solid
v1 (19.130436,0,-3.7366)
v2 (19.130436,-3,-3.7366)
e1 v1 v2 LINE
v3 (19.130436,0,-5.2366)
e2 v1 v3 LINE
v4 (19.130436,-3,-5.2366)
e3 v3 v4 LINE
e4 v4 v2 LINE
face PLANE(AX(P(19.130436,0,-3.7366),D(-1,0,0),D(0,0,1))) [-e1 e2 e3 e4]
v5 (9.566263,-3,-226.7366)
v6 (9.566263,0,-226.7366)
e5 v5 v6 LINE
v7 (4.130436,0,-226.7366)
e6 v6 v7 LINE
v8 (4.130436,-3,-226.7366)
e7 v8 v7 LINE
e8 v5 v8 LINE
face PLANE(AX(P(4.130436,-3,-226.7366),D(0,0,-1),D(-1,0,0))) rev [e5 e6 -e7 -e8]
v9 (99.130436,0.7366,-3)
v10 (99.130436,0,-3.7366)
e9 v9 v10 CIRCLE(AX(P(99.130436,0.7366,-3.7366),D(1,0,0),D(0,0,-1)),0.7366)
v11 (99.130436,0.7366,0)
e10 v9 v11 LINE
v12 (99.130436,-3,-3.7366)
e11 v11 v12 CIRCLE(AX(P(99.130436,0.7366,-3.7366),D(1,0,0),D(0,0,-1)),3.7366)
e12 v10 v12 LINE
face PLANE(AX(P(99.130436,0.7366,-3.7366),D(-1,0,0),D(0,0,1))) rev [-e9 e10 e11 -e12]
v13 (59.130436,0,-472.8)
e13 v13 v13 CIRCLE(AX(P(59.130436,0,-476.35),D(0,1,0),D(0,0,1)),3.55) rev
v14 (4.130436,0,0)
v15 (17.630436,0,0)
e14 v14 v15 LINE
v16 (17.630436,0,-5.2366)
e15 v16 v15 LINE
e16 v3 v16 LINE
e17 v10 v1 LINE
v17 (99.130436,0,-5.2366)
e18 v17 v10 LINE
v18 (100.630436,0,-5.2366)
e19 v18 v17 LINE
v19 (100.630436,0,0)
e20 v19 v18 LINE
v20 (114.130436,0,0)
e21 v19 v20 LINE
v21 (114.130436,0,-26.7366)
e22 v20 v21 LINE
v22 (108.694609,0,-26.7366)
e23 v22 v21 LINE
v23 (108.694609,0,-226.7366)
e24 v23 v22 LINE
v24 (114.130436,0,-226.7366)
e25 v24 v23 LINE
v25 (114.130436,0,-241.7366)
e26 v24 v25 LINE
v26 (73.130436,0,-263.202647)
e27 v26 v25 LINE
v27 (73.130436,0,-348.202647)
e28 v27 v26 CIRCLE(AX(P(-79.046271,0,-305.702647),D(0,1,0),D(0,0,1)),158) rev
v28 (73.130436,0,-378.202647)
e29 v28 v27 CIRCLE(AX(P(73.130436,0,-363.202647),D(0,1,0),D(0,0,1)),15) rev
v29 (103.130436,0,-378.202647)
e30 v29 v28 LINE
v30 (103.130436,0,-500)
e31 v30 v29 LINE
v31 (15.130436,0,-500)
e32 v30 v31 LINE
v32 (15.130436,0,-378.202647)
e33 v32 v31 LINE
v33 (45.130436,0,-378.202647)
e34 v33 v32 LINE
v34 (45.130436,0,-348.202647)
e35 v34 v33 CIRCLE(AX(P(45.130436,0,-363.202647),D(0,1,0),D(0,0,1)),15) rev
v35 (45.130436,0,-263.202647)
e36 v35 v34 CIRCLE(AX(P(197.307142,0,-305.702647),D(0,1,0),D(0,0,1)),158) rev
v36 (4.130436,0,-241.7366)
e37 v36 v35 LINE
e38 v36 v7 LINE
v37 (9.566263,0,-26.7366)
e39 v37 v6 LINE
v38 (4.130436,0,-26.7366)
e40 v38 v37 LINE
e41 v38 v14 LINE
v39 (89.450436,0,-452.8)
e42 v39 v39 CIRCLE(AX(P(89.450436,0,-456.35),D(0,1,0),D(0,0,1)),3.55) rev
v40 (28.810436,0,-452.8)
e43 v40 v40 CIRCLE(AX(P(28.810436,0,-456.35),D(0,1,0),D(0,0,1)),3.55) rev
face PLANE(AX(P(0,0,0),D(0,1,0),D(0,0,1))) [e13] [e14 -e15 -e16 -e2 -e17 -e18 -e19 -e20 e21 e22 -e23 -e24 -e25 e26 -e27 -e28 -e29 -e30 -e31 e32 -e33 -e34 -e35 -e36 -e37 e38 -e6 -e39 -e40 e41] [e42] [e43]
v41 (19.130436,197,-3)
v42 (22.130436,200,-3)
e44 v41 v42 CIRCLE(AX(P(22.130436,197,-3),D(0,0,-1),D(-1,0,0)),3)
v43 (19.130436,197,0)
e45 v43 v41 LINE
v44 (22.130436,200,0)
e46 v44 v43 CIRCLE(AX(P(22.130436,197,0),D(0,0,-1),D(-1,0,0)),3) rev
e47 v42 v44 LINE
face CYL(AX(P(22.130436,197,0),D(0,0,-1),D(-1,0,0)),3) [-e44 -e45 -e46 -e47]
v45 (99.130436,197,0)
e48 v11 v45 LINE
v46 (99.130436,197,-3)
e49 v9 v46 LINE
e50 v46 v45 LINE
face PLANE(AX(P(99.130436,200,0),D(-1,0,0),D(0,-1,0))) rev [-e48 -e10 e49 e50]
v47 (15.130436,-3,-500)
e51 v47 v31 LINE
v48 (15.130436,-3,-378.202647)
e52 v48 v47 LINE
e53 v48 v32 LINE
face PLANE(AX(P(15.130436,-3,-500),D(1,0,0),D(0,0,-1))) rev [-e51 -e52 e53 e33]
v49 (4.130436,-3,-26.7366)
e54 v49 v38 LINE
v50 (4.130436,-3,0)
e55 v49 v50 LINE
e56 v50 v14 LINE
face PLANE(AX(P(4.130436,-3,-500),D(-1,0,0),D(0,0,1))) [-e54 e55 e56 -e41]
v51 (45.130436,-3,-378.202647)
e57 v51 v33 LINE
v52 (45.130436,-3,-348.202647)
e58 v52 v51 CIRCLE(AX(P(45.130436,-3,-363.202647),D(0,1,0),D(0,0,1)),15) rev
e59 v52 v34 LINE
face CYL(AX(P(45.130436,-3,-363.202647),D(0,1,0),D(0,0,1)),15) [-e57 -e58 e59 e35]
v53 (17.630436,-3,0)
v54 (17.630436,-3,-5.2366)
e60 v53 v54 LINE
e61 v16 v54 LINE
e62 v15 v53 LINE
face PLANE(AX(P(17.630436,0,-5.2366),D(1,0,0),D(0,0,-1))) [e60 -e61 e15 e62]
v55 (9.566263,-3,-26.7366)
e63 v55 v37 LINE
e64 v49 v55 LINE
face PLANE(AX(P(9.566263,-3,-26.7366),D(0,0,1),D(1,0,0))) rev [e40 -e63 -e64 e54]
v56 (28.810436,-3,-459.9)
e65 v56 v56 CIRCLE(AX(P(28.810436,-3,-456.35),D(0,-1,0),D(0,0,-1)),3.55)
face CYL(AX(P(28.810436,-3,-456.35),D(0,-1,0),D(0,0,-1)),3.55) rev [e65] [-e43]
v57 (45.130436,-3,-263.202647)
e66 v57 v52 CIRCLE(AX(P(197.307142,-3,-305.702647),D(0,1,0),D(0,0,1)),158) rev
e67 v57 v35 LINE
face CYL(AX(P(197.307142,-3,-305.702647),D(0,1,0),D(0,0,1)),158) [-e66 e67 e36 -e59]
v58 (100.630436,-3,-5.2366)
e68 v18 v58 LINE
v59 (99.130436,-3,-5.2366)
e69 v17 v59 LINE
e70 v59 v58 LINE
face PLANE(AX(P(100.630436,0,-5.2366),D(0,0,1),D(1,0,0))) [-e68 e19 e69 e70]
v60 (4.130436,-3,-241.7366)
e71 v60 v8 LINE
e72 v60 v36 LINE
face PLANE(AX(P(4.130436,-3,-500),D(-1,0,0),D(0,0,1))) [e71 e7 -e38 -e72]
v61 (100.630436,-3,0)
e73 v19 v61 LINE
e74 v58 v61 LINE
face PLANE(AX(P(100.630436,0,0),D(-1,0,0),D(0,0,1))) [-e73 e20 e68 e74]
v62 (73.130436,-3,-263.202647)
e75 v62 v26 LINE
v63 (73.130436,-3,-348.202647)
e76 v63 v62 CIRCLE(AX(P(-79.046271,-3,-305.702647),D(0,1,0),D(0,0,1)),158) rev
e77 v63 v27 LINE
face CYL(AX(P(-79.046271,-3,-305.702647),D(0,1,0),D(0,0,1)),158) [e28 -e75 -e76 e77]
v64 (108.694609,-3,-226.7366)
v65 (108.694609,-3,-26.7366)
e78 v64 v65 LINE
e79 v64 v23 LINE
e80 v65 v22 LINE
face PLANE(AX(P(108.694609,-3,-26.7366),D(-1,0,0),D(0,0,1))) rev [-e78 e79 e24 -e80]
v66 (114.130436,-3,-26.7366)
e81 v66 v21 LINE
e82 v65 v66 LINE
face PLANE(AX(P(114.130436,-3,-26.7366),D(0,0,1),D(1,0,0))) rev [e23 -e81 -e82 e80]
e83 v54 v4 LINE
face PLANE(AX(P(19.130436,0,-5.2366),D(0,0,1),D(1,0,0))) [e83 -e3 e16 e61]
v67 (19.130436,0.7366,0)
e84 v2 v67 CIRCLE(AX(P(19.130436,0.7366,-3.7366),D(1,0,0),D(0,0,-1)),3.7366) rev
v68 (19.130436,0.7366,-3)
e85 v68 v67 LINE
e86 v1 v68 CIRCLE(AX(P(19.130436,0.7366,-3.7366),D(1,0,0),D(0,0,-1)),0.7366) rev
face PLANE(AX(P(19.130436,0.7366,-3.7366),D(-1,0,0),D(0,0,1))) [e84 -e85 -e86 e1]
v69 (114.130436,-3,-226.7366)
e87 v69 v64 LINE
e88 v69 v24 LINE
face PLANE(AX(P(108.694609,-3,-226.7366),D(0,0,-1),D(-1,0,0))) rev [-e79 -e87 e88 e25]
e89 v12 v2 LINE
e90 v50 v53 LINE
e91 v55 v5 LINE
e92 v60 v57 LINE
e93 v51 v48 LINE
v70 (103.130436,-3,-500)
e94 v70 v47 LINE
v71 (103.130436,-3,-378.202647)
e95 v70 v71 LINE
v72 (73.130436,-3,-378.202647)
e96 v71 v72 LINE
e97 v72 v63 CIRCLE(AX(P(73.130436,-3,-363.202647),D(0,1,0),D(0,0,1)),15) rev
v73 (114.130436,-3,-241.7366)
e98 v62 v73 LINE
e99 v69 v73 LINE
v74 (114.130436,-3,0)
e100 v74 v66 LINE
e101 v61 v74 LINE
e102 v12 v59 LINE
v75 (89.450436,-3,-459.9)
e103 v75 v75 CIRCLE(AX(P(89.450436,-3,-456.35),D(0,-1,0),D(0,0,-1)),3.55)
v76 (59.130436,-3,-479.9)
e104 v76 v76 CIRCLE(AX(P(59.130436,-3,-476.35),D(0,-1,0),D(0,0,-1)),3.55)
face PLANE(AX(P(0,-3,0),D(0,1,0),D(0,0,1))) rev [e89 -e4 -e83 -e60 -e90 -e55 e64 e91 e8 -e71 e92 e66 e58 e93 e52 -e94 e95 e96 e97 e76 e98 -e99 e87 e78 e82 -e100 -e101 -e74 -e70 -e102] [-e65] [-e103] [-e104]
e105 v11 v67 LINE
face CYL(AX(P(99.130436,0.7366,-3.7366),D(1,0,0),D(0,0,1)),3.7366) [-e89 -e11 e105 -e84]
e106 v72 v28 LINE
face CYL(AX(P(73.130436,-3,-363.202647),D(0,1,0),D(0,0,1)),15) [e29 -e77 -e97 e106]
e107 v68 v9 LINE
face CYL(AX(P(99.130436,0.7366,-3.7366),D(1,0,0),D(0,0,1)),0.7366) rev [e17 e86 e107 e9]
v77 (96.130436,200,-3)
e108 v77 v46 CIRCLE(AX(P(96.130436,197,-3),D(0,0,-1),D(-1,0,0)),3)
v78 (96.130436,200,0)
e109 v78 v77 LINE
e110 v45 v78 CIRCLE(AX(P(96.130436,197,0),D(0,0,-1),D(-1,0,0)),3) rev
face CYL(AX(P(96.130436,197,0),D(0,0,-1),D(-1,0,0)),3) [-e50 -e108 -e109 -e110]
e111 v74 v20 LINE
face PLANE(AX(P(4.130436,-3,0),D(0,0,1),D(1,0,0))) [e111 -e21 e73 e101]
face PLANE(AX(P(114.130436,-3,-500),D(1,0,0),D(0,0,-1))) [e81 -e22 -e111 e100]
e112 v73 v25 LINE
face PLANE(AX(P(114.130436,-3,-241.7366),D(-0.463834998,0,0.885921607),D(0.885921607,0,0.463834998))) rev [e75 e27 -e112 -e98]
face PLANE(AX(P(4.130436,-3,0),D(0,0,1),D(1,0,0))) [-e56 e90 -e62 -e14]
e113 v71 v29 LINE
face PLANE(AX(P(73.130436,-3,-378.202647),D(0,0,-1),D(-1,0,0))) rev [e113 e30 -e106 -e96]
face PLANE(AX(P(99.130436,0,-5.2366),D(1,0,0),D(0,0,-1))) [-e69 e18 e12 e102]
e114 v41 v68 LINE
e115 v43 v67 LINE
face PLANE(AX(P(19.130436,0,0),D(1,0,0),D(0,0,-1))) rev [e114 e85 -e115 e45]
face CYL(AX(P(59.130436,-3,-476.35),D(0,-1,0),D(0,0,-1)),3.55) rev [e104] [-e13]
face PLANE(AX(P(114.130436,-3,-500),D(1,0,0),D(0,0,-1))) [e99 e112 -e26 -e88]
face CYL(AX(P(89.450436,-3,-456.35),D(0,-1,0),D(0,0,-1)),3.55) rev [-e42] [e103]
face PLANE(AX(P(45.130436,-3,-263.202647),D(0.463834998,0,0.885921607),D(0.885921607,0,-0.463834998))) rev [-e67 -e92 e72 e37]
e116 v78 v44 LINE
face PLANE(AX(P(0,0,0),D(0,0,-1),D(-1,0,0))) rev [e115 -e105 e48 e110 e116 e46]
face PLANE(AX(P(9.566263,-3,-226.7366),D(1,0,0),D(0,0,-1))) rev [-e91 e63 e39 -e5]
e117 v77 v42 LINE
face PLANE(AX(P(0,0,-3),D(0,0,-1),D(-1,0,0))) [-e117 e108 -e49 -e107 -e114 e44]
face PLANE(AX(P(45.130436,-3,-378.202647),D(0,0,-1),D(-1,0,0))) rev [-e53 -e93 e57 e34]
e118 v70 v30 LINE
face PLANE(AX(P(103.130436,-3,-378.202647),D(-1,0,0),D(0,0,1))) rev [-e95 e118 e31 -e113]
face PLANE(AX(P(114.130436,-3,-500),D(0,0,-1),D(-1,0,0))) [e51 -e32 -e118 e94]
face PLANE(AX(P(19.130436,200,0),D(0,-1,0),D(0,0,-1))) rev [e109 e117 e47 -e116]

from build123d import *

# Parameters (mm, degrees)
BASE_FLANGE1_START                     = -3
BASE_FLANGE1_OUTLINE_W                 = 110
BASE_FLANGE1_OUTLINE_H                 = 500
BASE_FLANGE1_DEPTH                     = 3
T_LE_PLI_E_SUR_AR_TE1_STRIP_W          = 13.4732
T_LE_PLI_E_SUR_AR_TE1_STRIP_H          = 3
T_LE_PLI_E_SUR_AR_TE1_STRIP_CUT_DEPTH  = 80
T_LE_PLI_E_SUR_AR_TE1_RELIEF_W         = 14.9732
T_LE_PLI_E_SUR_AR_TE1_RELIEF_H         = 1.5
T_LE_PLI_E_SUR_AR_TE1_RELIEF_CUT_DEPTH = 3
T_LE_PLI_E_SUR_AR_TE1_DEPTH            = 80
FILLET2_R                              = 3
CUT_EXTRUDE2_DEPTH                     = 552.574796719
CUT_EXTRUDE2_DEPTH_BACK                = 3
F_7_1_7_1_DIAMETER_SLOT1_D             = 7.1
F_7_1_7_1_DIAMETER_SLOT1_DEPTH         = 3
F_7_1_7_1_DIAMETER_SLOT1_TIP           = 2.133055198


# Read off the part's stored shape, not the designer's step: Base-Flange1
# Sheet-metal steps are written as plain solids
with BuildPart() as part:
    # Base-Flange1 outline → Base-Flange1 (new body)
    with BuildSketch(Plane(origin=(0, 0, 0), x_dir=(1, 0, 0), z_dir=(0, 1, 0)).offset(BASE_FLANGE1_START)):
        with Locations((59.130435799, 250)):
            Rectangle(BASE_FLANGE1_OUTLINE_W, BASE_FLANGE1_OUTLINE_H)
    extrude(amount=BASE_FLANGE1_DEPTH)

    # Tôle pliée sur arête1 strip (across the edge) → Tôle pliée sur arête1 strip cut (cut)
    with BuildSketch(Plane(origin=(19.130435799, 0, 0), x_dir=(0, 0, -1), z_dir=(1, 0, 0))):
        with Locations((-3, -1.5)):
            Rectangle(T_LE_PLI_E_SUR_AR_TE1_STRIP_W, T_LE_PLI_E_SUR_AR_TE1_STRIP_H)
    extrude(amount=T_LE_PLI_E_SUR_AR_TE1_STRIP_CUT_DEPTH, mode=Mode.SUBTRACT)

    # Tôle pliée sur arête1 relief (on the sheet) → Tôle pliée sur arête1 relief cut (cut)
    with BuildSketch(Plane(origin=(19.130435799, 0, -3.7366), x_dir=(0, 0, -1), z_dir=(0, 1, 0))):
        with Locations((-5.9866, 0.75)):
            Rectangle(T_LE_PLI_E_SUR_AR_TE1_RELIEF_W, T_LE_PLI_E_SUR_AR_TE1_RELIEF_H)
        with Locations((-5.9866, -80.75)):
            Rectangle(T_LE_PLI_E_SUR_AR_TE1_RELIEF_W, T_LE_PLI_E_SUR_AR_TE1_RELIEF_H)
    extrude(amount=-T_LE_PLI_E_SUR_AR_TE1_RELIEF_CUT_DEPTH, mode=Mode.SUBTRACT)

    # Tôle pliée sur arête1 section (across the edge) → Tôle pliée sur arête1 (add)
    with BuildSketch(Plane(origin=(19.130435799, 0, 0), x_dir=(0, 0, -1), z_dir=(1, 0, 0))):
        with BuildLine():
            Line((0, 0.7366), (0, 200))
            Line((0, 200), (3, 200))
            Line((3, 200), (3, 0.7366))
            ThreePointArc((3, 0.7366), (3.215745145, 0.215745145), (3.7366, 0))
            Line((3.7366, 0), (3.7366, -3))
            ThreePointArc((3.7366, -3), (1.094424801, -1.905575199), (0, 0.7366))
        make_face()
    extrude(amount=T_LE_PLI_E_SUR_AR_TE1_DEPTH)

    # Fillet2
    fillet2_edges = [part.edges().sort_by_distance(p)[0] for p in [
        (19.130435799, 200, -1.5),
        (99.130435799, 200, -1.5),
        (4.130435799, -1.5, -500),
        (114.130435799, -1.5, -500),
    ]]
    fillet(fillet2_edges, radius=FILLET2_R)

    # Sketch14 → Cut-Extrude2 (cut, two sides: drawn at the far end of the back side and taken through both)
    with BuildSketch(Plane.XZ.offset(3).offset(-CUT_EXTRUDE2_DEPTH_BACK)):
        with BuildLine():
            Line((1095.888112959, -26.7366), (114.130435799, -26.7366))
            Line((114.130435799, -26.7366), (108.694609025, -26.7366))
            Line((108.694609025, -26.7366), (108.694609025, -226.7366))
            Line((108.694609025, -226.7366), (114.130435799, -226.7366))
            Line((114.130435799, -226.7366), (114.130435799, -241.7366))
            Line((114.130435799, -241.7366), (73.130435799, -263.202647067))
            ThreePointArc((73.130435799, -263.202647067), (78.953729303, -305.702647067), (73.130435799, -348.202647067))
            ThreePointArc((73.130435799, -348.202647067), (88.130435799, -363.202647067), (73.130435799, -378.202647067))
            Line((73.130435799, -378.202647067), (103.130435799, -378.202647067))
            Line((103.130435799, -378.202647067), (103.130435799, -500))
            Line((103.130435799, -500), (15.130435799, -500))
            Line((15.130435799, -500), (15.130435799, -378.202647067))
            Line((15.130435799, -378.202647067), (45.130435799, -378.202647067))
            ThreePointArc((45.130435799, -378.202647067), (30.130435799, -363.202647067), (45.130435799, -348.202647067))
            ThreePointArc((45.130435799, -348.202647067), (39.307142295, -305.702647067), (45.130435799, -263.202647067))
            Line((45.130435799, -263.202647067), (4.130435799, -241.7366))
            Line((4.130435799, -241.7366), (4.130435799, -226.7366))
            Line((4.130435799, -226.7366), (9.566262574, -226.7366))
            Line((9.566262574, -226.7366), (9.566262574, -26.7366))
            Line((9.566262574, -26.7366), (4.130435799, -26.7366))
            Line((4.130435799, -26.7366), (-977.62724136, -26.7366))
            Line((-977.62724136, -26.7366), (-977.62724136, -1990.251954319))
            Line((-977.62724136, -1990.251954319), (1095.888112959, -1990.251954319))
            Line((1095.888112959, -1990.251954319), (1095.888112959, -26.7366))
        make_face()
    extrude(amount=CUT_EXTRUDE2_DEPTH + CUT_EXTRUDE2_DEPTH_BACK, mode=Mode.SUBTRACT)

    # Ø7.1 (7.1) Diameter Slot1
    with Locations(Plane(origin=(0, -3, 0), x_dir=(-1, 0, 0), z_dir=(0, -1, 0))):
        with Locations((-59.130435799, 476.35), (-89.450435799, 456.35), (-28.810435799, 456.35)):
            Hole(F_7_1_7_1_DIAMETER_SLOT1_D / 2, depth=F_7_1_7_1_DIAMETER_SLOT1_DEPTH)
            with Locations((0, 0, -(F_7_1_7_1_DIAMETER_SLOT1_DEPTH + F_7_1_7_1_DIAMETER_SLOT1_TIP / 2))):  # 118° drill point
                Cone(0, F_7_1_7_1_DIAMETER_SLOT1_D / 2, F_7_1_7_1_DIAMETER_SLOT1_TIP, mode=Mode.SUBTRACT)


solid = part.part
